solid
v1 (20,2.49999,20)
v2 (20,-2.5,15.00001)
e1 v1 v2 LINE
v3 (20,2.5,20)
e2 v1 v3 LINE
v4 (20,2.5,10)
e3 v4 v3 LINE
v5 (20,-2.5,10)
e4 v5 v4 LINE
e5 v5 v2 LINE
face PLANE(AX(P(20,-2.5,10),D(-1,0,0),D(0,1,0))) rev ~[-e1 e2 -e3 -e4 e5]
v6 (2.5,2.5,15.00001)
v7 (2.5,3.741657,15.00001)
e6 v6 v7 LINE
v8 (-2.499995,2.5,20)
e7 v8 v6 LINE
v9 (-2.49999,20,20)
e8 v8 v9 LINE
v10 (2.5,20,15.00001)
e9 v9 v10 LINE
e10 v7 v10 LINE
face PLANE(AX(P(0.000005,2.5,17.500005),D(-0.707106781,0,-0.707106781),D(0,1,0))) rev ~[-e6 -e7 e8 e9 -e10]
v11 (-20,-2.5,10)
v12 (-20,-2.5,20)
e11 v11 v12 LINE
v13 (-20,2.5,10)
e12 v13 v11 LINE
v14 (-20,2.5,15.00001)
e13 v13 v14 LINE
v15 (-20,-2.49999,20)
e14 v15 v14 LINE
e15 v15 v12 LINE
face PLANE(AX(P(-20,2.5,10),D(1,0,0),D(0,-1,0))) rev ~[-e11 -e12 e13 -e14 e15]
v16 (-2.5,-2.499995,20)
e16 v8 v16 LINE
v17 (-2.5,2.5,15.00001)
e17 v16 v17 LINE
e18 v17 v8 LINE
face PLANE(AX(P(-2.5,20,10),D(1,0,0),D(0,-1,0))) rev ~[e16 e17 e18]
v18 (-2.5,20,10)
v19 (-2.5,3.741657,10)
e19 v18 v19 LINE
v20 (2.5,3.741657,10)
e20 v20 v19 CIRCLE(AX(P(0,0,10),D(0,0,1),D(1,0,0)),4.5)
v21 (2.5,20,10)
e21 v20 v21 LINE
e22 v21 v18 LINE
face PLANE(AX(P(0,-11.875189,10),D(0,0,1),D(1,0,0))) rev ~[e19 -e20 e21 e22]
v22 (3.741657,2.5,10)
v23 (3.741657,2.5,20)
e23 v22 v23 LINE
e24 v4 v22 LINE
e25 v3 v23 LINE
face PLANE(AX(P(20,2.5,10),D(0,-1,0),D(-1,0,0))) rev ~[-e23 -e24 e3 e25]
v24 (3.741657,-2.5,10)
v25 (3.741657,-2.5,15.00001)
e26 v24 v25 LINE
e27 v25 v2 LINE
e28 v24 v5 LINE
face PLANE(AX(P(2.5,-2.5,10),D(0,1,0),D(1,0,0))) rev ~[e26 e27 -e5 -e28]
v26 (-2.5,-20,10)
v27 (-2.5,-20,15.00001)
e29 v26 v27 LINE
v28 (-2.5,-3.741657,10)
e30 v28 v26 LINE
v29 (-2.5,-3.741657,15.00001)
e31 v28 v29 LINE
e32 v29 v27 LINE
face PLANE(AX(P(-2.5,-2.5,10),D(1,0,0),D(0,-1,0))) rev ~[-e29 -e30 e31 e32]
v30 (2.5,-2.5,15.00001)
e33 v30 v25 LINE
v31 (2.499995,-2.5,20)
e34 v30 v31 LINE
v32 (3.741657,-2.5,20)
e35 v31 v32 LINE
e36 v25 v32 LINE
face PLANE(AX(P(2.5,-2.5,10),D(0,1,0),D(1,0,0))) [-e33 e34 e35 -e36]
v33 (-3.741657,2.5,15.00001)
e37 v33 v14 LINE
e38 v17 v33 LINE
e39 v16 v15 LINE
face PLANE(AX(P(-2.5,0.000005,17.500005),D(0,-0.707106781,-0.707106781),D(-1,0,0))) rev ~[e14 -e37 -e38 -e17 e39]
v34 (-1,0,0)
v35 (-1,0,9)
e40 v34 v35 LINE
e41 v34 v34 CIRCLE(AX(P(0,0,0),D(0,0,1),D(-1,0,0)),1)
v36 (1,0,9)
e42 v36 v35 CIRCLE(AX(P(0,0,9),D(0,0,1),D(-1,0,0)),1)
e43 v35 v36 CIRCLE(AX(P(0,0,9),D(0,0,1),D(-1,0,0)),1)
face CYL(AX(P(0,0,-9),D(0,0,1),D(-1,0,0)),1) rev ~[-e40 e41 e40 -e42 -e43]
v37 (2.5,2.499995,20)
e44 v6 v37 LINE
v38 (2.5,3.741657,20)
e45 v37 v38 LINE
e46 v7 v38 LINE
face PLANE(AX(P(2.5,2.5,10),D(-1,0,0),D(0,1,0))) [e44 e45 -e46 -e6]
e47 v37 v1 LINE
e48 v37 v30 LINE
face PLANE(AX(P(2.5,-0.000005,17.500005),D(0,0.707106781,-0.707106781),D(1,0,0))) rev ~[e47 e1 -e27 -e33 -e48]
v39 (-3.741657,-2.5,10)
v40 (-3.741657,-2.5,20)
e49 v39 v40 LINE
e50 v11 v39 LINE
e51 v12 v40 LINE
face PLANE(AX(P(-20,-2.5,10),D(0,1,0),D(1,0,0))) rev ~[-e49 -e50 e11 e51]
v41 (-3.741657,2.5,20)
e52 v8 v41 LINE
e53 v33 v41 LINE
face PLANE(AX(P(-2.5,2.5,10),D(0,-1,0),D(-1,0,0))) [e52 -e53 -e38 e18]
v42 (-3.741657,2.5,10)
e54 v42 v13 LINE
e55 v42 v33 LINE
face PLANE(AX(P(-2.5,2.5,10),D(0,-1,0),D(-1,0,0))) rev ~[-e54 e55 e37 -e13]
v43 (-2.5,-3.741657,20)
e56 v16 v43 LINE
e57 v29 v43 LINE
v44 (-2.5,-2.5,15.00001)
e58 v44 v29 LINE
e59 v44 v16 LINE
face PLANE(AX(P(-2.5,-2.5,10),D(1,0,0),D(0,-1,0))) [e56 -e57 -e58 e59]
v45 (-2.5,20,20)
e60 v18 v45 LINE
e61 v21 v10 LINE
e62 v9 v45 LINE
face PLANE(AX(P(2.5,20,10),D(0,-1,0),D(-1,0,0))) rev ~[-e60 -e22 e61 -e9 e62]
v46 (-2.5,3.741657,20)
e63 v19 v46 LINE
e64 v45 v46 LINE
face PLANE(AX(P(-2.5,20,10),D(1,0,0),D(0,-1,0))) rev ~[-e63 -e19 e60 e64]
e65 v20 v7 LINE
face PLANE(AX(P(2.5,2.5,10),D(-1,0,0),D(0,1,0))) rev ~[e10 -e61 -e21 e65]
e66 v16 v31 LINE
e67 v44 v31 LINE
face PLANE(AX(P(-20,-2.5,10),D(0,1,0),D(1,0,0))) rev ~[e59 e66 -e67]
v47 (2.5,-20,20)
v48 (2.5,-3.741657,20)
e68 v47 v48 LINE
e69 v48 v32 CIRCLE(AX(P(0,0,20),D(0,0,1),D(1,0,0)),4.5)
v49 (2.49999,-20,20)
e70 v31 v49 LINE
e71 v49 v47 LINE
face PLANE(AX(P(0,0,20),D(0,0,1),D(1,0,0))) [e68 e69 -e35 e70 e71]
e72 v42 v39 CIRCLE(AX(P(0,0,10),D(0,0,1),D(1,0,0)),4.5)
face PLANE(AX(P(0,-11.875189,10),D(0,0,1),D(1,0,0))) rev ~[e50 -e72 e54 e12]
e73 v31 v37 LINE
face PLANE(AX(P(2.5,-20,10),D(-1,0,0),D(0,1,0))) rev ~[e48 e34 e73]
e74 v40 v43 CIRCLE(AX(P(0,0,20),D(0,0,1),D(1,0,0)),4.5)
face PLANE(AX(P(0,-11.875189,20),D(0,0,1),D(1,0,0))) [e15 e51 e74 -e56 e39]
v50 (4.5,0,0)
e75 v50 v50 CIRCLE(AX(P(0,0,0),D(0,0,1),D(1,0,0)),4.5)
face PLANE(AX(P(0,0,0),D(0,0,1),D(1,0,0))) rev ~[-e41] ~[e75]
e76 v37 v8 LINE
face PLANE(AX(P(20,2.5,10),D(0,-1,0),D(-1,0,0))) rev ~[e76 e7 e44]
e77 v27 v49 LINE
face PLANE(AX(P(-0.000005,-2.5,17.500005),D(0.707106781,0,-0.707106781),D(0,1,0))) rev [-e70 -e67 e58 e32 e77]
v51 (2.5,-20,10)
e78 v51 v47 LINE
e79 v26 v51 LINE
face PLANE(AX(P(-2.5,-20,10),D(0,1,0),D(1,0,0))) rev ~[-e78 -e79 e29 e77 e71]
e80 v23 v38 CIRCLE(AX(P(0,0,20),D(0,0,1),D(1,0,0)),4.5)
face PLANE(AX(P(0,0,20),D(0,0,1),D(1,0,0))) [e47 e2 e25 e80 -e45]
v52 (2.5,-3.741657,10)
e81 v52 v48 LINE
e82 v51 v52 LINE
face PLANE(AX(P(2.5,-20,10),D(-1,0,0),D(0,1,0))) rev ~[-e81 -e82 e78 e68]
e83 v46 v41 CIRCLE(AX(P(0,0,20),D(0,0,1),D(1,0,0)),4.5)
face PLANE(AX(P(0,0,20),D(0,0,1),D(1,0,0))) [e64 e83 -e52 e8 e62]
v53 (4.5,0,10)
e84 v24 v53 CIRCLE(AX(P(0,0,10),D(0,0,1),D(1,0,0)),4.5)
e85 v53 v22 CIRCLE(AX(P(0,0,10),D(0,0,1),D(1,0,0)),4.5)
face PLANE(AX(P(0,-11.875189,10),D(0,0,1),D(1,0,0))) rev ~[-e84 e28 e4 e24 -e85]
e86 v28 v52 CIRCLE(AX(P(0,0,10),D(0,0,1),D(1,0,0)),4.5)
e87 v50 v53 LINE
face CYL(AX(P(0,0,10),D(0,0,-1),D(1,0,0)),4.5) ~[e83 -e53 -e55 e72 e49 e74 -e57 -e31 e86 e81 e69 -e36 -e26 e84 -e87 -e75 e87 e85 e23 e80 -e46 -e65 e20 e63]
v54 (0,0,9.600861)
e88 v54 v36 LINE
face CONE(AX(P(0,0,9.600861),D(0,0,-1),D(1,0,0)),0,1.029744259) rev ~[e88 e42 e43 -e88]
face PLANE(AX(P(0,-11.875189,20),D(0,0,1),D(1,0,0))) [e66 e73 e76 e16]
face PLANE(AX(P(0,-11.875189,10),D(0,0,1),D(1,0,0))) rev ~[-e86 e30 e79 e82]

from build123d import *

# Parameters (mm, degrees)
F0_R     = 4.5
F1_DEPTH = 10
F2_W     = 5
F2_H     = 5
F3_DEPTH = 10
F4_SIZE  = 4.99999
F5_DEPTH = 10
F7_D     = 2
F7_DEPTH = 9
F7_TIP   = 0.600860619


# Not quite as in the source:
# - a fillet or chamfer is up to 0.001 mm smaller than in the source, because OpenCascade refuses the exact size


with BuildPart() as f1:
    # F0 (on Top) → F1 (new body)
    with BuildSketch(Plane.XY):
        Circle(F0_R)
    extrude(amount=F1_DEPTH)

    # F2 (on face) → F3 (join)
    with BuildSketch(Plane.XY.offset(10)):
        with BuildLine():
            ThreePointArc((2.5, -3.7416573868), (0, -4.5), (-2.5, -3.7416573868))
            Line((-2.5, -3.7416573868), (-2.5, -20))
            Line((-2.5, -20), (2.5, -20))
            Line((2.5, -20), (2.5, -3.7416573868))
        make_face()
        with BuildLine():
            Line((-3.7416573868, 2.5), (-20, 2.5))
            Line((-20, 2.5), (-20, -2.5))
            Line((-20, -2.5), (-3.7416573868, -2.5))
            ThreePointArc((-3.7416573868, -2.5), (-4.5, 0), (-3.7416573868, 2.5))
        make_face()
        with BuildLine():
            Line((-2.5, 20), (-2.5, 3.7416573868))
            ThreePointArc((-2.5, 3.7416573868), (0, 4.5), (2.5, 3.7416573868))
            Line((2.5, 3.7416573868), (2.5, 20))
            Line((2.5, 20), (-2.5, 20))
        make_face()
        with BuildLine():
            Line((20, 2.5), (3.7416573868, 2.5))
            ThreePointArc((3.7416573868, 2.5), (4.3062430401, 1.3062430401), (4.5, 0))
            ThreePointArc((4.5, 0), (4.3062430401, -1.3062430401), (3.7416573868, -2.5))
            Line((3.7416573868, -2.5), (20, -2.5))
            Line((20, -2.5), (20, 2.5))
        make_face()
        with BuildLine():
            Line((3.7416573868, 2.5), (2.5, 2.5))
            Line((2.5, 2.5), (2.5, -2.5))
            Line((2.5, -2.5), (3.7416573868, -2.5))
            ThreePointArc((3.7416573868, -2.5), (4.3062430401, -1.3062430401), (4.5, 0))
            ThreePointArc((4.5, 0), (4.3062430401, 1.3062430401), (3.7416573868, 2.5))
        make_face()
        Rectangle(F2_W, F2_H)
        with BuildLine():
            Line((2.5, -2.5), (-2.5, -2.5))
            Line((-2.5, -2.5), (-2.5, -3.7416573868))
            ThreePointArc((-2.5, -3.7416573868), (0, -4.5), (2.5, -3.7416573868))
            Line((2.5, -3.7416573868), (2.5, -2.5))
        make_face()
        with BuildLine():
            Line((-2.5, 2.5), (-3.7416573868, 2.5))
            ThreePointArc((-3.7416573868, 2.5), (-4.5, 0), (-3.7416573868, -2.5))
            Line((-3.7416573868, -2.5), (-2.5, -2.5))
            Line((-2.5, -2.5), (-2.5, 2.5))
        make_face()
        with BuildLine():
            Line((-2.5, 3.7416573868), (-2.5, 2.5))
            Line((-2.5, 2.5), (2.5, 2.5))
            Line((2.5, 2.5), (2.5, 3.7416573868))
            ThreePointArc((2.5, 3.7416573868), (0, 4.5), (-2.5, 3.7416573868))
        make_face()
    extrude(amount=F3_DEPTH)

    # F4 (size 5 in the source; OpenCascade refuses exactly that, so slightly less here)
    f4_edges = [f1.edges().sort_by_distance(p)[0] for p in [
        (-2.5, -11.25, 20),
        (-11.25, 2.5, 20),
        (2.5, 11.25, 20),
        (11.25, -2.5, 20),
    ]]
    chamfer(f4_edges, length=F4_SIZE)

    # F5 (add): faces of the model
    f5_faces = [f1.faces().sort_by_distance(p)[0] for p in [
        (-2.940797231, 2.940797231, 10),
        (2.940797231, 2.940797231, 10),
        (2.940797231, -2.940797231, 10),
        (-2.940797231, -2.940797231, 10),
    ]]
    extrude(f5_faces, amount=F5_DEPTH)

    # F7
    with Locations(Plane(origin=(0, 0, 0), x_dir=(1, 0, 0), z_dir=(0, 0, -1))):
        with Locations((0, 0)):
            Hole(F7_D / 2, depth=F7_DEPTH)
            with Locations((0, 0, -(F7_DEPTH + F7_TIP / 2))):  # 118° drill point
                Cone(0, F7_D / 2, F7_TIP, mode=Mode.SUBTRACT)


solid = f1.part
